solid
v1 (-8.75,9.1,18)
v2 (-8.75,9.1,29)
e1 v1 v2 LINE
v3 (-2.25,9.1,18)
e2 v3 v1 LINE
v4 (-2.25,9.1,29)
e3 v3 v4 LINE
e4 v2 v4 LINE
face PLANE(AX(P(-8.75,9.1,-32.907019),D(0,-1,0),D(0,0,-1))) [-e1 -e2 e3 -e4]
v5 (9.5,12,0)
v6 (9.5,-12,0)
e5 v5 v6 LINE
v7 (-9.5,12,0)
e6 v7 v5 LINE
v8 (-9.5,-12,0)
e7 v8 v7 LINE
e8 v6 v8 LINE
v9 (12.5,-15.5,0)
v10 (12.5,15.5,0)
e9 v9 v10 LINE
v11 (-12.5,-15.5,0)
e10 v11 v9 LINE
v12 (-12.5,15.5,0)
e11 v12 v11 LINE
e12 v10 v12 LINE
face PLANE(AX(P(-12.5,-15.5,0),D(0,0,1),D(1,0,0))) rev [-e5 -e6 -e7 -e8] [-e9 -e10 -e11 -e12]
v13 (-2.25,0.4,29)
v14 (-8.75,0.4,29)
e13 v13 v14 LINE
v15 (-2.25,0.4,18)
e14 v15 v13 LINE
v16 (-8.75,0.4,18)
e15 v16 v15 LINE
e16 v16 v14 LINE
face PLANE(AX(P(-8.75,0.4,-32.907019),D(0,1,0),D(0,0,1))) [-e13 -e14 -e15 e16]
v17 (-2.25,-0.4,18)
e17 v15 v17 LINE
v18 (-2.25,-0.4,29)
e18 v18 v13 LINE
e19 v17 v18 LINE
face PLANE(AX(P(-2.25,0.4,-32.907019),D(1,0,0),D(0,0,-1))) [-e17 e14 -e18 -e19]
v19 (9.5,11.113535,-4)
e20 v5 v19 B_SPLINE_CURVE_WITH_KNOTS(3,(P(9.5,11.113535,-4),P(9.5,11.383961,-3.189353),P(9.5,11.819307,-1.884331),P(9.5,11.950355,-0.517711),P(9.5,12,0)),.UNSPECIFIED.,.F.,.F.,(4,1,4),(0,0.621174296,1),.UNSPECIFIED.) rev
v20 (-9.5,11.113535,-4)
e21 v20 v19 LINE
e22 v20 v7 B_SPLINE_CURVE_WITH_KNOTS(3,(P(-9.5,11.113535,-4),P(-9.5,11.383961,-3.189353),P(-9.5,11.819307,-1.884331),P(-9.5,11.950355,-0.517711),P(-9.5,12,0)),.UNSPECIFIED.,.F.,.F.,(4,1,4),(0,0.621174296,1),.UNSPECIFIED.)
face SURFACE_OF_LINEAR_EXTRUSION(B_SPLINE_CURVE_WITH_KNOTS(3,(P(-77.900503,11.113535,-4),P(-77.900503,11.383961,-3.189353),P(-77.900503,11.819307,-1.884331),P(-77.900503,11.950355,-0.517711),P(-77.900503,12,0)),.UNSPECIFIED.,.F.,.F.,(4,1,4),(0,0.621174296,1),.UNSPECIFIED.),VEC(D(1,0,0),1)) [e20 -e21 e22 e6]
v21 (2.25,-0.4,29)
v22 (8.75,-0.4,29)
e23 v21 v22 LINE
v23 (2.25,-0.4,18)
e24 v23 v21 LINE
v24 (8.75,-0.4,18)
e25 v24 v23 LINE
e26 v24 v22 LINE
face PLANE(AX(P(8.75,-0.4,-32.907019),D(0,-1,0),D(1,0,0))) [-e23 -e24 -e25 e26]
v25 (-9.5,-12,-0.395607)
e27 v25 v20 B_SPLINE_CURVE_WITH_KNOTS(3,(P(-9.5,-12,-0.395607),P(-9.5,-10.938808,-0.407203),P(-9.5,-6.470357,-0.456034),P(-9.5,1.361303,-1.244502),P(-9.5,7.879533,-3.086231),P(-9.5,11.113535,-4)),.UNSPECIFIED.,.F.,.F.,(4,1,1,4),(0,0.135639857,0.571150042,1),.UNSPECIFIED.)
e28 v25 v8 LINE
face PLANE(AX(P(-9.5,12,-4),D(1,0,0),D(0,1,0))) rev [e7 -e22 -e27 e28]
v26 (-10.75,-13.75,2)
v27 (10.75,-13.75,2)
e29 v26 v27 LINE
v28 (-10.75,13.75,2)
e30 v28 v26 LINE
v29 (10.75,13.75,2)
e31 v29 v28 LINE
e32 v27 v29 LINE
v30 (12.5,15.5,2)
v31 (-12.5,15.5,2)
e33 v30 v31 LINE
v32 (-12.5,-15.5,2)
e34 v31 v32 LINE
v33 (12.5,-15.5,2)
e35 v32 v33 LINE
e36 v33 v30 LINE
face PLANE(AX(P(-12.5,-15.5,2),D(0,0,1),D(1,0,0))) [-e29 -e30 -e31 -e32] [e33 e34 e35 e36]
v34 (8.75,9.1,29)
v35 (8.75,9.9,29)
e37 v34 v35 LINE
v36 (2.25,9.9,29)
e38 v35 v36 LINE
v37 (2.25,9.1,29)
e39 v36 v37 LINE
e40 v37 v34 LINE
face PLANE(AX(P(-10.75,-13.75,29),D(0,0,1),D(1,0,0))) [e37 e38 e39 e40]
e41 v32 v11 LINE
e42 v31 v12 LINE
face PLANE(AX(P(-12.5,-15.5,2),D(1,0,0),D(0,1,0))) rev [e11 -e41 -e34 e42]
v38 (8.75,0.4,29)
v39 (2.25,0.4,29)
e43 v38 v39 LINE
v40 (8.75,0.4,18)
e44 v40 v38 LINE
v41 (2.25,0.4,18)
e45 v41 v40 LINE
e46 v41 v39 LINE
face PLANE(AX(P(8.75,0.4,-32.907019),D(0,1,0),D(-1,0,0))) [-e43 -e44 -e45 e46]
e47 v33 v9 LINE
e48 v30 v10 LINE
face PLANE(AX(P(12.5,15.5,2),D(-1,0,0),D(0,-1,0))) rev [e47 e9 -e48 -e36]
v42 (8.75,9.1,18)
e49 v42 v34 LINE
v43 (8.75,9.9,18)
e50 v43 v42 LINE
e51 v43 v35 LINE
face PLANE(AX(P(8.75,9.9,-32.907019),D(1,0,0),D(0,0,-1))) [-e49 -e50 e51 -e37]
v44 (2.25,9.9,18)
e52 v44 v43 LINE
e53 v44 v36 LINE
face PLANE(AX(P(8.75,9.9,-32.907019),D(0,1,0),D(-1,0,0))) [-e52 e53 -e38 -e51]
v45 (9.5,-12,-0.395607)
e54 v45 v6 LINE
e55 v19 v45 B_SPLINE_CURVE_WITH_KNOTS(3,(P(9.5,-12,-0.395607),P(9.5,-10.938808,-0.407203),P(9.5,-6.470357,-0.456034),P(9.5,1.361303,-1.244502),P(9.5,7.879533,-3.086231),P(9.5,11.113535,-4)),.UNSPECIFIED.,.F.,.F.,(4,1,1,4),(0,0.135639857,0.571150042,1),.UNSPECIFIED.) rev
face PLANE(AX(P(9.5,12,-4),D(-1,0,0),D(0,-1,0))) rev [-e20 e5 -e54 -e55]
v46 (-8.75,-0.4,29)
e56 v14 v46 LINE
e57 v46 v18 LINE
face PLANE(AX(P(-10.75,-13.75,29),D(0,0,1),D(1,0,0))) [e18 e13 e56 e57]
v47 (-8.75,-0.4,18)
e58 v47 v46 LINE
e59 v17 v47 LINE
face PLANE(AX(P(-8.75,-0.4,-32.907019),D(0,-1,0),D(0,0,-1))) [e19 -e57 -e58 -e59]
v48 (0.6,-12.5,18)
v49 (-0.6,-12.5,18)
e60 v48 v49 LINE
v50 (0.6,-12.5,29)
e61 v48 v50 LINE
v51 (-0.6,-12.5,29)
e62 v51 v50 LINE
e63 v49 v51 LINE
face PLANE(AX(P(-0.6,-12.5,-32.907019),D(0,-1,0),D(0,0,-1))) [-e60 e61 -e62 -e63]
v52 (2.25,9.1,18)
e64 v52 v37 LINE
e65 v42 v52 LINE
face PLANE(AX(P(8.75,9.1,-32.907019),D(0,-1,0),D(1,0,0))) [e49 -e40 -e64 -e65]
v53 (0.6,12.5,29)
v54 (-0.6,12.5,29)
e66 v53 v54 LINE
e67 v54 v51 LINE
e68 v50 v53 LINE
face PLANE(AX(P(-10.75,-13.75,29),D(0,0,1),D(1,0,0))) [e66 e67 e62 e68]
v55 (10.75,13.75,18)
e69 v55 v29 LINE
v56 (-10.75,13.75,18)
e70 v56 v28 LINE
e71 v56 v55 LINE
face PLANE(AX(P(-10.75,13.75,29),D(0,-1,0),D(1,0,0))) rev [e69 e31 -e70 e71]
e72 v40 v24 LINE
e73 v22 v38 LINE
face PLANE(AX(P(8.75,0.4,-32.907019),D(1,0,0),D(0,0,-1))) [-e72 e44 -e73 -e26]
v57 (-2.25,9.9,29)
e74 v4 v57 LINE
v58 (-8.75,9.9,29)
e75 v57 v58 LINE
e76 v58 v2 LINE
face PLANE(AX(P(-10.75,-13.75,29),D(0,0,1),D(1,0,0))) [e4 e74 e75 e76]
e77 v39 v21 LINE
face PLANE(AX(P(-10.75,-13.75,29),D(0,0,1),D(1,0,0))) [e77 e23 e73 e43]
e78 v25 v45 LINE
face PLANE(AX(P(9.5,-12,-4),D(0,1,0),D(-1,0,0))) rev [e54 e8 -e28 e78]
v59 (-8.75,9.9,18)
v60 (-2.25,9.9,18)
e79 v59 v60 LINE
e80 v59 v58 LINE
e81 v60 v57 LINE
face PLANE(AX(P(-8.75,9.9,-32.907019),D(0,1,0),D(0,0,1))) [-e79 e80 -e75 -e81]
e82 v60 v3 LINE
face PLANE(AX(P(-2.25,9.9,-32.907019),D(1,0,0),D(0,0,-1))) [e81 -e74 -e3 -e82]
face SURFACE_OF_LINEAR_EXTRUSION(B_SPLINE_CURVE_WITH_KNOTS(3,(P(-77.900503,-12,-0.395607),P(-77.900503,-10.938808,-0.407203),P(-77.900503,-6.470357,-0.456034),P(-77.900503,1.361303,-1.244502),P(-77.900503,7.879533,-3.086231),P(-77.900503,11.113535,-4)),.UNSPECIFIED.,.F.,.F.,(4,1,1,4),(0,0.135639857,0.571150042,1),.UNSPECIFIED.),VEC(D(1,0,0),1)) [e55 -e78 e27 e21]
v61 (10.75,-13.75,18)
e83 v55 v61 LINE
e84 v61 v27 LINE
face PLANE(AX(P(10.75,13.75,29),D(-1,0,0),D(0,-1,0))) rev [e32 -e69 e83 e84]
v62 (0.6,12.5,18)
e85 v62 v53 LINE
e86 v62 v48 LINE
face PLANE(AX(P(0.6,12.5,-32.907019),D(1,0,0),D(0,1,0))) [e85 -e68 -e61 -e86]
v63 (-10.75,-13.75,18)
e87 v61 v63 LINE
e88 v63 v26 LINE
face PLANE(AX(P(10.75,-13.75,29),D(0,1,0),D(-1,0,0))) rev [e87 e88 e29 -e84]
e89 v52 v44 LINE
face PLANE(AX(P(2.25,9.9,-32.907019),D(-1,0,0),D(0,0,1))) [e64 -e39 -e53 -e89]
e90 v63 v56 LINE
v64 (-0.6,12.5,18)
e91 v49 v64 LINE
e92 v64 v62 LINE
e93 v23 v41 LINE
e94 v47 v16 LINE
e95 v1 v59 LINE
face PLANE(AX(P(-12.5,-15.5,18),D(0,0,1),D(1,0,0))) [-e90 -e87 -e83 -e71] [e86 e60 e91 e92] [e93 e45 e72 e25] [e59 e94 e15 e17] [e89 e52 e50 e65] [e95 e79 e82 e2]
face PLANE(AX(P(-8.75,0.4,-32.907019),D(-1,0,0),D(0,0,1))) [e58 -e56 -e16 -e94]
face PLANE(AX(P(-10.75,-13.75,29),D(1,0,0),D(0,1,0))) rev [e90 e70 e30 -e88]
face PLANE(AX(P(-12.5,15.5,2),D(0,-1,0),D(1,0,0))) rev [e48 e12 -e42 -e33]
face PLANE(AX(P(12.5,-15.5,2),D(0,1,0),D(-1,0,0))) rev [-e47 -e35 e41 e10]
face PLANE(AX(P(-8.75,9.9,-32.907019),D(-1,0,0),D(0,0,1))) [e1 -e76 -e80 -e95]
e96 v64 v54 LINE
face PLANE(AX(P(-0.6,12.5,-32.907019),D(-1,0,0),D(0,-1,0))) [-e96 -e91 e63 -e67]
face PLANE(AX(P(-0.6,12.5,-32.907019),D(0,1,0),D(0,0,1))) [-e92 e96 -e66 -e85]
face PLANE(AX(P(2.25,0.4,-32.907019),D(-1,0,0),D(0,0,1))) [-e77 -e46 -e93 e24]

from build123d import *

# Parameters (mm, degrees)
SKETCH_1_W          = 25
SKETCH_1_H          = 31
EXTRUDE_1_DEPTH     = 2
SKETCH_2_W          = 21.5
SKETCH_2_H          = 27.5
EXTRUDE_2_DEPTH     = 27
SKETCH_3_W          = 19
SKETCH_3_H          = 24
EXTRUDE_3_DEPTH     = 4
CUT_EXTRUDE_START   = -19
CUT_EXTRUDE_1_DEPTH = 19
SKETCH_6_W          = 21.5
SKETCH_6_H          = 27.5
SKETCH_6_W_2        = 1.2
SKETCH_6_H_2        = 25
SKETCH_6_W_3        = 6.5
SKETCH_6_H_3        = 0.8
CUT_EXTRUDE_2_DEPTH = 11


# Read off the part's stored shape, not the designer's step: 切除-拉伸1
with BuildPart() as part:
    # 草图1 → 拉伸1 (new body)
    with BuildSketch(Plane.XY):
        Rectangle(SKETCH_1_W, SKETCH_1_H)
    extrude(amount=EXTRUDE_1_DEPTH)

    # 草图2 → 拉伸2 (add)
    with BuildSketch(Plane.XY.offset(2)):
        Rectangle(SKETCH_2_W, SKETCH_2_H)
    extrude(amount=EXTRUDE_2_DEPTH)

    # 草图3 → 拉伸3 (add)
    with BuildSketch(Plane(origin=(0, 0, 0), x_dir=(-1, 0, 0), z_dir=(0, 0, -1))):
        Rectangle(SKETCH_3_W, SKETCH_3_H)
    extrude(amount=EXTRUDE_3_DEPTH)

    # 切除-拉伸1 outline → 切除-拉伸1 (cut)
    with BuildSketch(Plane.ZY.offset(9.5).offset(CUT_EXTRUDE_START)):
        with BuildLine():
            Line((-4, -12), (-0.39560665, -12))
            add(Edge.make_bspline(
                [(-0.39560665, -12), (-0.407203251, -10.938807734), (-0.456034027, -6.470357075), (-1.244501589, 1.361302539), (-3.086230941, 7.87953286), (-4, 11.113535286)],
                knots=[0, 0, 0, 0, 0.135639857, 0.571150042, 1, 1, 1, 1], degree=3))
            Line((-4, 11.113535286), (-4, -12))
        make_face()
        with BuildLine():
            Line((-4, 12), (-4, 11.113535286))
            add(Edge.make_bspline(
                [(-4, 11.113535286), (-3.189353387, 11.383960845), (-1.884330596, 11.819306546), (-0.517710732, 11.950355346), (0, 12)],
                knots=[0, 0, 0, 0, 0.621174296, 1, 1, 1, 1], degree=3))
            Line((0, 12), (-4, 12))
        make_face()
    extrude(amount=CUT_EXTRUDE_1_DEPTH, mode=Mode.SUBTRACT)

    # 草图6 → 切除-拉伸2 (cut)
    with BuildSketch(Plane.XY.offset(29)):
        Rectangle(SKETCH_6_W, SKETCH_6_H)
        Rectangle(SKETCH_6_W_2, SKETCH_6_H_2, mode=Mode.SUBTRACT)
        with Locations((-5.5, 9.5)):
            Rectangle(SKETCH_6_W_3, SKETCH_6_H_3, mode=Mode.SUBTRACT)
        with Locations((5.5, 9.5)):
            Rectangle(SKETCH_6_W_3, SKETCH_6_H_3, mode=Mode.SUBTRACT)
        with Locations((-5.5, 0)):
            Rectangle(SKETCH_6_W_3, SKETCH_6_H_3, mode=Mode.SUBTRACT)
        with Locations((5.5, 0)):
            Rectangle(SKETCH_6_W_3, SKETCH_6_H_3, mode=Mode.SUBTRACT)
    extrude(amount=-CUT_EXTRUDE_2_DEPTH, mode=Mode.SUBTRACT)


solid = part.part
